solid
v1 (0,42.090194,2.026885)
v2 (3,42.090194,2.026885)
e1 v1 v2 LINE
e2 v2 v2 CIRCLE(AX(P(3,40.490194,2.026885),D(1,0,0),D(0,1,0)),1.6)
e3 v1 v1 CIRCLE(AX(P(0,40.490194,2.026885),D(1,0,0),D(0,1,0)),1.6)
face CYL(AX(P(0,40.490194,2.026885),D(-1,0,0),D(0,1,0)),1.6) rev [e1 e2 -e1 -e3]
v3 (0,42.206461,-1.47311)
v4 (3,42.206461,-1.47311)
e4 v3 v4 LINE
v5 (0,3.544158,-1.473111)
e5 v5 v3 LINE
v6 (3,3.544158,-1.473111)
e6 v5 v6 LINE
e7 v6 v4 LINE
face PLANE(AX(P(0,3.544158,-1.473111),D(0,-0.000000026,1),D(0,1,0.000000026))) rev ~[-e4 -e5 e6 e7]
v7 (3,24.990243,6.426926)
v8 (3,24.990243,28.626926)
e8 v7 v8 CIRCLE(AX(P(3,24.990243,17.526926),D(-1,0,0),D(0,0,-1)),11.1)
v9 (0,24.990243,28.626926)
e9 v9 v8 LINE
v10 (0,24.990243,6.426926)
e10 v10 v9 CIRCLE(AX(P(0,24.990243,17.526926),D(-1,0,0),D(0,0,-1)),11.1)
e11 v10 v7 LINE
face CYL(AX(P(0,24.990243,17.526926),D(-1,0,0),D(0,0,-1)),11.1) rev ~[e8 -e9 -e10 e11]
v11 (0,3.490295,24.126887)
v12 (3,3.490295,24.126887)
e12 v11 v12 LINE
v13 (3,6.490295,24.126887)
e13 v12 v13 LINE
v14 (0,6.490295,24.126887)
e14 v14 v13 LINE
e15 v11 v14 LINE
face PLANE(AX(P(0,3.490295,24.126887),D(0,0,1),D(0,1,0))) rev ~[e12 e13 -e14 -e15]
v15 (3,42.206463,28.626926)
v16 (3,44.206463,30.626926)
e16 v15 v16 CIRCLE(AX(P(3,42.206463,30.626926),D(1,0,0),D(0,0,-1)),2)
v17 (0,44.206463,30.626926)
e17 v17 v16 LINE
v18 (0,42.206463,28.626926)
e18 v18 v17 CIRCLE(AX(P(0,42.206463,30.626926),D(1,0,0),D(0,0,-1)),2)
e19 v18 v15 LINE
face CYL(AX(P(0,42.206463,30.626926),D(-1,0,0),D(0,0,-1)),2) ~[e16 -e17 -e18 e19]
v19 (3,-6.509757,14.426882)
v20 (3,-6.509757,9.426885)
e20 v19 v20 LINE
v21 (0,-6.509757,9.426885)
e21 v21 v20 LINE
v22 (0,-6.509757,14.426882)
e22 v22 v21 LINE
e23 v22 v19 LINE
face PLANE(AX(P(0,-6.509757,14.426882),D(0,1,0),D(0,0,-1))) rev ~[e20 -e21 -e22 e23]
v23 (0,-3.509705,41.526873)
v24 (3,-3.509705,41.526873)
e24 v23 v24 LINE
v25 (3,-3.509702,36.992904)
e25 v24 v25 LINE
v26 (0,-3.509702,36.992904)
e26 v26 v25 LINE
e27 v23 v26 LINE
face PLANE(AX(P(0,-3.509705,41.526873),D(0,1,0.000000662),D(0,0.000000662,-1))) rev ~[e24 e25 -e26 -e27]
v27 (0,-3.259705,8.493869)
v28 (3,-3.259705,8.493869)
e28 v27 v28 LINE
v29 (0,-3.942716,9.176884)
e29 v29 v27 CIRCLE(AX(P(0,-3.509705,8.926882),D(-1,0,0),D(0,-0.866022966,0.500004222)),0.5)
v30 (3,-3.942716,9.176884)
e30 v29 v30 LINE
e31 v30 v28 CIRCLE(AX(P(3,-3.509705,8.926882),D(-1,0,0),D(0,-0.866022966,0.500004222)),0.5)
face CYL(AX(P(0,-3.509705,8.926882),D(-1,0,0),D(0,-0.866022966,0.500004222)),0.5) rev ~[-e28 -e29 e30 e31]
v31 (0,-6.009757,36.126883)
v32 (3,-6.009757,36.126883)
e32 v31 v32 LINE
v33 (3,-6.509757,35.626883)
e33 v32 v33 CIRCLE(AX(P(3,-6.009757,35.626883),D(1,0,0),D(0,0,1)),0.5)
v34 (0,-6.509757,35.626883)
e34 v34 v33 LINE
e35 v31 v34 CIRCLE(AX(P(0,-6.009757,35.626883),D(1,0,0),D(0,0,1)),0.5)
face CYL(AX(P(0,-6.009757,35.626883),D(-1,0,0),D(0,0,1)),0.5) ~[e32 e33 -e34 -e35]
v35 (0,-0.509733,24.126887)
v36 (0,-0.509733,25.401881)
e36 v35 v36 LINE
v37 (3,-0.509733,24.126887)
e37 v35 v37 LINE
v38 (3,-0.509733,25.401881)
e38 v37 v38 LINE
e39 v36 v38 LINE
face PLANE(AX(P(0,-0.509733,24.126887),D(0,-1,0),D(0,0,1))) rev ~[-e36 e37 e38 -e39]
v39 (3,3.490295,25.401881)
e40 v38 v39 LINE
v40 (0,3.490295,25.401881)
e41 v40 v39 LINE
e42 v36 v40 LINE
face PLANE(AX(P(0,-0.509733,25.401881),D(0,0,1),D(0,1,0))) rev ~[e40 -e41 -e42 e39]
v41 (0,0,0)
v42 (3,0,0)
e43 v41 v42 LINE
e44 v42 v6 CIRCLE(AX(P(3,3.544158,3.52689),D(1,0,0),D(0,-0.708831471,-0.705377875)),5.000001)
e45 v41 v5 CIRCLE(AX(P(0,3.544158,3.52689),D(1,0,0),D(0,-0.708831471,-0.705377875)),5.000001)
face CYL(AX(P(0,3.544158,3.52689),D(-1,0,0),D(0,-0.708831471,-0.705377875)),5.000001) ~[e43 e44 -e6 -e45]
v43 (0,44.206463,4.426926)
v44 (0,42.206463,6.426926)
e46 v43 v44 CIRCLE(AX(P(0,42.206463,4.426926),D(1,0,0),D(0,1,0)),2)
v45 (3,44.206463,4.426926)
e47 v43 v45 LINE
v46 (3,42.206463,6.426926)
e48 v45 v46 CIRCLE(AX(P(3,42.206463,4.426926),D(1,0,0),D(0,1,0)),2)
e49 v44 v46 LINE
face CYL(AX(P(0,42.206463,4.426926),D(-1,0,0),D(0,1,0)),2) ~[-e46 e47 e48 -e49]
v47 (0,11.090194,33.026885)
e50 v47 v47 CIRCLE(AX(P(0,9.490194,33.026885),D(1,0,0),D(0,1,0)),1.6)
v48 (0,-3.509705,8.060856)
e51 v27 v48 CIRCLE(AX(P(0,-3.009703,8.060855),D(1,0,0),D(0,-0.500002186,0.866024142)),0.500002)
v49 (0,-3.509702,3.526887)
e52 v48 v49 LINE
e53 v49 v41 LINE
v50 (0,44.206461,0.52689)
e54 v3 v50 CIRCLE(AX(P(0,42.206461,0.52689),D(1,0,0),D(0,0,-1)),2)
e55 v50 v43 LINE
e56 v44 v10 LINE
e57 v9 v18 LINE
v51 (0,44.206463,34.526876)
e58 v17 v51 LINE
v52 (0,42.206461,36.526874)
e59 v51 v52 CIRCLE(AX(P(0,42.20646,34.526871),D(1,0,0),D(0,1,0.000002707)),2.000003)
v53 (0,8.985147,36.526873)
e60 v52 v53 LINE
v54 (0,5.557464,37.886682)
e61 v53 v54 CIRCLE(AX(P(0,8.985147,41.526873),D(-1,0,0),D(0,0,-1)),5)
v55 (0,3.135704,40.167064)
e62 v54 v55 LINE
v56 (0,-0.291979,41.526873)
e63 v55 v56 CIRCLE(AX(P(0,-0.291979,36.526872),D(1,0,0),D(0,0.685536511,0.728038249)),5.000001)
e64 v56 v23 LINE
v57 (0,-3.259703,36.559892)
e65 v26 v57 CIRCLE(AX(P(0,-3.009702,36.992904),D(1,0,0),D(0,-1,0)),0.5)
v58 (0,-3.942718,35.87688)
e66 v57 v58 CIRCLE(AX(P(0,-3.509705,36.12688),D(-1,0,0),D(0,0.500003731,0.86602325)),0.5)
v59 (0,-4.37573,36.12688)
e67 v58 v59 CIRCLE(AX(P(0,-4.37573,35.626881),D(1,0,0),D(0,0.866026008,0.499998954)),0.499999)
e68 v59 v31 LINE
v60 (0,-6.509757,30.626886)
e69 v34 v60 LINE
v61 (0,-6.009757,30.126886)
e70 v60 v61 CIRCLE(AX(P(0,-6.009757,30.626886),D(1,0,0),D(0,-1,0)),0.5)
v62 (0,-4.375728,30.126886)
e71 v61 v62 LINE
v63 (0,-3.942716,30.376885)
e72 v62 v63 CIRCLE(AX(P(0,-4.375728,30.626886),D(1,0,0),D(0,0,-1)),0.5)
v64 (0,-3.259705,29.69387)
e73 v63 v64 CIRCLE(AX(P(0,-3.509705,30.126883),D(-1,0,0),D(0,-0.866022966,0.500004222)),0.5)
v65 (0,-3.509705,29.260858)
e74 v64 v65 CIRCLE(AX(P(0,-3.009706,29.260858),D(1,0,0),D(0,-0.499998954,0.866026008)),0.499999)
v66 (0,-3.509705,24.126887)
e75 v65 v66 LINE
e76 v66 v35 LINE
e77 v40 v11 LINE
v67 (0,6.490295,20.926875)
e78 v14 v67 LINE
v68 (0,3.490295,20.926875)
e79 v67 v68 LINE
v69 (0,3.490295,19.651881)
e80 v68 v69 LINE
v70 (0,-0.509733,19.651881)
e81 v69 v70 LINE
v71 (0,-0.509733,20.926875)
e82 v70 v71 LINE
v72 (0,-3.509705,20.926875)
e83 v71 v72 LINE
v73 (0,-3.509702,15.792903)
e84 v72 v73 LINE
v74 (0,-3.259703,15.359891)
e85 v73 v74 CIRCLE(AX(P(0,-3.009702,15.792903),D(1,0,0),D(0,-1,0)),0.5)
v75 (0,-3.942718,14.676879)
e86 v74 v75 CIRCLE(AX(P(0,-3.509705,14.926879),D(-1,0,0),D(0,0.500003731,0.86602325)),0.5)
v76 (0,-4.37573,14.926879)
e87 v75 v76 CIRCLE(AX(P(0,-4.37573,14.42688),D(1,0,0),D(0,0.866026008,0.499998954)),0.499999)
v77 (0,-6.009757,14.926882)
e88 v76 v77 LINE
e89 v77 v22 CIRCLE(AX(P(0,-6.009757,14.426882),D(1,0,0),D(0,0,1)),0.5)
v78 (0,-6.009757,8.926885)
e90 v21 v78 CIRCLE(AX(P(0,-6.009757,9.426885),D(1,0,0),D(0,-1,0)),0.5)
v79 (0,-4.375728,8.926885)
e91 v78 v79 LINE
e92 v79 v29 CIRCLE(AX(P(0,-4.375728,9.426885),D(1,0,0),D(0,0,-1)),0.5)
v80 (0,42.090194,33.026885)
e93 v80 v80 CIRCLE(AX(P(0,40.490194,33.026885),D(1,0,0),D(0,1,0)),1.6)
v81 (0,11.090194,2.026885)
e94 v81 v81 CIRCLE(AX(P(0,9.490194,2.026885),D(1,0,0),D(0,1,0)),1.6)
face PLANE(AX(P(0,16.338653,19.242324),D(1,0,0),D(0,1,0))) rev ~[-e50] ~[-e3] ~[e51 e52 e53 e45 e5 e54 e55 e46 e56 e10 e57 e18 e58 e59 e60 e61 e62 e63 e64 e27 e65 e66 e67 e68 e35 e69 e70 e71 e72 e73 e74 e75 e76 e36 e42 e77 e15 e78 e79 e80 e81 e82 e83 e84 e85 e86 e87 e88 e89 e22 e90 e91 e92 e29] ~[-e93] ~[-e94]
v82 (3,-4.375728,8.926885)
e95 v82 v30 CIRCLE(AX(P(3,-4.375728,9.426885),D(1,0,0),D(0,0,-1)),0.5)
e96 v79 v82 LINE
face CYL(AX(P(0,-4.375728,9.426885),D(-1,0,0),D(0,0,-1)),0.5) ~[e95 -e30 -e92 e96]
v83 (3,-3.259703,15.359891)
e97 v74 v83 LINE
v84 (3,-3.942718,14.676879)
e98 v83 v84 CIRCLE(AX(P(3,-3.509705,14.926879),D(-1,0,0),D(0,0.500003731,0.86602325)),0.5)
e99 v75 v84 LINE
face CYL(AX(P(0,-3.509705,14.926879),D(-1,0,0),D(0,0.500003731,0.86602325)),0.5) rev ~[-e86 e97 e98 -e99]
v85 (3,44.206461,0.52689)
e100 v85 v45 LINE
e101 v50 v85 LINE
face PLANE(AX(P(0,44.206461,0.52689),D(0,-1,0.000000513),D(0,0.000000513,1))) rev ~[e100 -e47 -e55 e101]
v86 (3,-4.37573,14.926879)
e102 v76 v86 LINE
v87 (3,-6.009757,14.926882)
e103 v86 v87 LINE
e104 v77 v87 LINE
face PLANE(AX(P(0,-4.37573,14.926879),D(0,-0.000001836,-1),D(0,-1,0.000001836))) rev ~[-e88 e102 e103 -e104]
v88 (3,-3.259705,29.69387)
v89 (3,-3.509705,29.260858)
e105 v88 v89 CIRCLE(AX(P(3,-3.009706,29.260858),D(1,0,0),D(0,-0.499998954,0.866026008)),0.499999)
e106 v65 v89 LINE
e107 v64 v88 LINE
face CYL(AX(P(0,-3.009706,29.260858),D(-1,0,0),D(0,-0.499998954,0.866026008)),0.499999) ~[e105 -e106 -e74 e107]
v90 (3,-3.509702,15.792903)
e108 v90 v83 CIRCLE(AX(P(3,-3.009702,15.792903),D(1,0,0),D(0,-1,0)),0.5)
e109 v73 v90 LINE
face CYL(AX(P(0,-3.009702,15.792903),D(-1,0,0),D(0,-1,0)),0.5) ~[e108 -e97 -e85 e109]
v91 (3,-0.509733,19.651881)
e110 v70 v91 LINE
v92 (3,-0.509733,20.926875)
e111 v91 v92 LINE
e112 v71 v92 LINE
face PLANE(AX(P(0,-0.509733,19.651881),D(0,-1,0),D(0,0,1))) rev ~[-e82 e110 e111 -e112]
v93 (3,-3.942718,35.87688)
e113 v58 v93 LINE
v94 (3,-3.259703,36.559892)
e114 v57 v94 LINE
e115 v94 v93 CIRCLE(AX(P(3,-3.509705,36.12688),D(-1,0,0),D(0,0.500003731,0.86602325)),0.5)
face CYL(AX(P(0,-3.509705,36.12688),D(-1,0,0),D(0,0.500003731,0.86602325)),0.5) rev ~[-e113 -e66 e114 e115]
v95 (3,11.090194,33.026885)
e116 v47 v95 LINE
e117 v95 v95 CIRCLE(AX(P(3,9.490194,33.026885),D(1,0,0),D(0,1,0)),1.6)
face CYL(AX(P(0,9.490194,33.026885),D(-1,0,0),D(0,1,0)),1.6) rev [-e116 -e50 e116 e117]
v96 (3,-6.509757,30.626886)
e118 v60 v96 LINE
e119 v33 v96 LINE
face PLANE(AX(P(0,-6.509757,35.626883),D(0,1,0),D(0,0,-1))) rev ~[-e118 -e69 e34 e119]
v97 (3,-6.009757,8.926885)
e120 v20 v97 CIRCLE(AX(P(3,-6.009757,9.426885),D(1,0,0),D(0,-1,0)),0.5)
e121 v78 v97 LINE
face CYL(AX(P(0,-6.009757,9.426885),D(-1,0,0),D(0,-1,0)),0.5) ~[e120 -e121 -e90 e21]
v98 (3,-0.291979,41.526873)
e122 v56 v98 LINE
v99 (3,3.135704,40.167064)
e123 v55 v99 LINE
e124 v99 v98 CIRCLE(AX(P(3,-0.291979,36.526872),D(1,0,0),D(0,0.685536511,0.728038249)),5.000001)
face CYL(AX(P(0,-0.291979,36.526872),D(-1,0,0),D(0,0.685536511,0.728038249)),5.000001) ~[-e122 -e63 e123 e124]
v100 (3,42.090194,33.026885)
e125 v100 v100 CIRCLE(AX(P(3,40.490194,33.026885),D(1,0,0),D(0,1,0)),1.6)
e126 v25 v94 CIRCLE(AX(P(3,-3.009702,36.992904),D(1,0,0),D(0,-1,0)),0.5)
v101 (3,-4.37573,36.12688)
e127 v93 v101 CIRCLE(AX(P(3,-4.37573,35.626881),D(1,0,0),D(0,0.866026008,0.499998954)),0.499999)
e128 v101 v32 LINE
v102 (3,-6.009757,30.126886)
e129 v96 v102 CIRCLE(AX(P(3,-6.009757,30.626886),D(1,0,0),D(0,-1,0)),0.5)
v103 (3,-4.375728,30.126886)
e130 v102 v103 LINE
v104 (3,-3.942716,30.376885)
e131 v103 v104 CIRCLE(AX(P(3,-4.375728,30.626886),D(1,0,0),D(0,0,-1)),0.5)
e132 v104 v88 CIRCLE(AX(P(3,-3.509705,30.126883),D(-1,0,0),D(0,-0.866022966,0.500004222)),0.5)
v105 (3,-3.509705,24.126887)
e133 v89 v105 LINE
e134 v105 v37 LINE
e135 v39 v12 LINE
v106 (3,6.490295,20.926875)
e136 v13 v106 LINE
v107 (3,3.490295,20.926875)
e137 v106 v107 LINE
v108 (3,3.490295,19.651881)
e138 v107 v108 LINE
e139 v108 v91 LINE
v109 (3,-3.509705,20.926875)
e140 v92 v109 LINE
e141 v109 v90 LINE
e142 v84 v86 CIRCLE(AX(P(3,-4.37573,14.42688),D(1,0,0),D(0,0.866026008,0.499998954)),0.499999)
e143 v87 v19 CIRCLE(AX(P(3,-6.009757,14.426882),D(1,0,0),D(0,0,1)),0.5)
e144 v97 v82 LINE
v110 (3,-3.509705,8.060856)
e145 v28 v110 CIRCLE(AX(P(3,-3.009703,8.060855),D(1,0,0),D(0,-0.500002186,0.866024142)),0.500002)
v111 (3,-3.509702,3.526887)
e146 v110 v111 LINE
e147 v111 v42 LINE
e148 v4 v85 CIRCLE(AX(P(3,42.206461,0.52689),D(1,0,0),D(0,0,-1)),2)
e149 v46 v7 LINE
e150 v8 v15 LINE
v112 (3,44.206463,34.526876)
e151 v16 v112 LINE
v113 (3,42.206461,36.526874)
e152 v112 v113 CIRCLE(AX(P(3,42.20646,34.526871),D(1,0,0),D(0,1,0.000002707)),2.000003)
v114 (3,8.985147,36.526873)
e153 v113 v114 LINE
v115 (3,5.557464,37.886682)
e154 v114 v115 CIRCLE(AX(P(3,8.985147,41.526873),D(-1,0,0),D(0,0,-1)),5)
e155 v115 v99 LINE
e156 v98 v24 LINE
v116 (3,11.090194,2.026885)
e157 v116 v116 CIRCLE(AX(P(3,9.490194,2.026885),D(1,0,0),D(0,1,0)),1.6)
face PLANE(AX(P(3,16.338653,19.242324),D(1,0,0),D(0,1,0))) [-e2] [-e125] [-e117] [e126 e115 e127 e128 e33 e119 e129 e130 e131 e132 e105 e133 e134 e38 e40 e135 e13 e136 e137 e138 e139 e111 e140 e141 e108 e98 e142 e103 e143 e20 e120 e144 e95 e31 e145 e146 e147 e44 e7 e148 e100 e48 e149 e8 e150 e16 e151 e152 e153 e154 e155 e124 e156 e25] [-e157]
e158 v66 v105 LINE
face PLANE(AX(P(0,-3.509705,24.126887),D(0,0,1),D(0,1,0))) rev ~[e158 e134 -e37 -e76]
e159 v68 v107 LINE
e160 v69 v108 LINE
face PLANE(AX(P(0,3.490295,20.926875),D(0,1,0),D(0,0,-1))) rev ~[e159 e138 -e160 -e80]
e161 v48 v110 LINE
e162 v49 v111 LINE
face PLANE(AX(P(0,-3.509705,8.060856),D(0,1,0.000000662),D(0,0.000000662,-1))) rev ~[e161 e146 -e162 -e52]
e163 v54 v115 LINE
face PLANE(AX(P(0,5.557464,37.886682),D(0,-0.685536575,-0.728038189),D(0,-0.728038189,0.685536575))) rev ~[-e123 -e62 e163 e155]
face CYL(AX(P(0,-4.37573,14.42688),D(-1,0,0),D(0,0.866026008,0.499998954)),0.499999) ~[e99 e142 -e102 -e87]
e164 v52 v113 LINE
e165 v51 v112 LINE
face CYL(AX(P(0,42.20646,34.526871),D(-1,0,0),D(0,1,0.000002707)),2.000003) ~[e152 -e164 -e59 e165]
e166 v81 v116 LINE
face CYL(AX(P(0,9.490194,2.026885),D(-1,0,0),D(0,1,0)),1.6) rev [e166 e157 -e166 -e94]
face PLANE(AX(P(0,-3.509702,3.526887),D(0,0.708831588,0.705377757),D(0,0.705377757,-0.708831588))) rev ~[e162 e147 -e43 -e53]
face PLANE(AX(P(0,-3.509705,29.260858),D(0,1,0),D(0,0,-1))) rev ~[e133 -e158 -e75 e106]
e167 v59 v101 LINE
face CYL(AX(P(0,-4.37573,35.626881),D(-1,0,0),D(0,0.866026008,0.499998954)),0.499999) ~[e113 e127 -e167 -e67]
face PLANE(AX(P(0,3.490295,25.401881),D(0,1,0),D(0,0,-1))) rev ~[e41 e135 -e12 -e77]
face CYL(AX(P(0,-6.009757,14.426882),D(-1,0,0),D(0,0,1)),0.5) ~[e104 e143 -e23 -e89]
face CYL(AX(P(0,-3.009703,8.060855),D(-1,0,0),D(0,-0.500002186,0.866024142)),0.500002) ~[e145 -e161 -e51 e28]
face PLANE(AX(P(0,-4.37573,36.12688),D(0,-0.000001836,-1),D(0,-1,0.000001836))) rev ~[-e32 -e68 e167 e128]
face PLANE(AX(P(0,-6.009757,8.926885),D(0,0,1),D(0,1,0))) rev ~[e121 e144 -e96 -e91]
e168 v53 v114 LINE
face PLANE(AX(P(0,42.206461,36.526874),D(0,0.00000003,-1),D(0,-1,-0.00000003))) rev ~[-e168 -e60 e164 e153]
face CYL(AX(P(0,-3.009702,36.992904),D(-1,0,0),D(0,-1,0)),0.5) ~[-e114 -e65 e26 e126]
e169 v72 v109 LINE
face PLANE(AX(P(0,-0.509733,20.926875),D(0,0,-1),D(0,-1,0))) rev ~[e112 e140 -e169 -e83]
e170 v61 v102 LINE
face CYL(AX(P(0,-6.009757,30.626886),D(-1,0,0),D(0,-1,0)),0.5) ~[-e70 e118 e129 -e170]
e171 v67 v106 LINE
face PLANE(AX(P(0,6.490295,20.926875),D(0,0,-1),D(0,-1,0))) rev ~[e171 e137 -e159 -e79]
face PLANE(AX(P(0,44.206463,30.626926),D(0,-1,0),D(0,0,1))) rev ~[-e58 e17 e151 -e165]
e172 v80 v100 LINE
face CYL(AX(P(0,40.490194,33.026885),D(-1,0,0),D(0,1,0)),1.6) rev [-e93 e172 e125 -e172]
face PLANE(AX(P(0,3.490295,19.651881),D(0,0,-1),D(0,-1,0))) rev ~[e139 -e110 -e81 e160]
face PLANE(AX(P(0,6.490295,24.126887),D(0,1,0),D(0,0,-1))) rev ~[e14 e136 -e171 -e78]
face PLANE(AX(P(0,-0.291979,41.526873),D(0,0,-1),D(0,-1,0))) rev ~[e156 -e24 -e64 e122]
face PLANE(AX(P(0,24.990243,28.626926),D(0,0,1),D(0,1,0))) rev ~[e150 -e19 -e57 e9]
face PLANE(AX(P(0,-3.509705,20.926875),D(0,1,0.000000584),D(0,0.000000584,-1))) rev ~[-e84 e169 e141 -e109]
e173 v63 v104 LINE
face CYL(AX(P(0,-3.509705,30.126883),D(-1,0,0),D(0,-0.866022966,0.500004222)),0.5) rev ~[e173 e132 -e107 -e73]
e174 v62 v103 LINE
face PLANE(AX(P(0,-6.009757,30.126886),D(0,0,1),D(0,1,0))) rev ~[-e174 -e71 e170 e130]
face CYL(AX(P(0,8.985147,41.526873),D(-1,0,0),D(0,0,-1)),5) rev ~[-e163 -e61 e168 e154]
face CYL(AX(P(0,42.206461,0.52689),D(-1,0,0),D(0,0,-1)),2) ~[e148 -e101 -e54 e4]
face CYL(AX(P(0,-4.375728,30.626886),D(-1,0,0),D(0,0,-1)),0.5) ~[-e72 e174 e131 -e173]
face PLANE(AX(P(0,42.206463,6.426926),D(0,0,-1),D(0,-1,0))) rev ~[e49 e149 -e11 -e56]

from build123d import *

# Parameters (mm, degrees)
F0_R     = 1.6
F1_DEPTH = 3


# Not quite as in the source:
# - ends of sketch curves that miss each other by under 0.0002 mm in the source are joined


with BuildPart() as f1:
    # F0 (on Right) → F1 (new body)
    with BuildSketch(Plane.YZ):
        with BuildLine():
            Line((6.490295, 24.126887), (6.490295, 20.926875))
            Line((6.490295, 20.926875), (3.490295, 20.926875))
            Line((3.490295, 20.926875), (3.490295, 19.651881))
            Line((3.490295, 19.651881), (-0.509733, 19.651881))
            Line((-0.509733, 19.651881), (-0.509733, 20.926875))
            Line((-0.509733, 20.926875), (-3.509705, 20.926875))
            Line((-3.509705, 20.926875), (-3.509702, 15.792903))
            ThreePointArc((-3.509702, 15.792903), (-3.4427150061, 15.542903527), (-3.2597030539, 15.3598909066))
            ThreePointArc((-3.2597030539, 15.3598909066), (-3.1561520924, 14.5733251264), (-3.9427177764, 14.6768791291))
            ThreePointArc((-3.9427177764, 14.6768791291), (-4.1257299355, 14.8598916646), (-4.37573, 14.926879))
            Line((-4.37573, 14.926879), (-6.009757, 14.926882))
            ThreePointArc((-6.009757, 14.926882), (-6.3633103906, 14.7804353906), (-6.509757, 14.426882))
            Line((-6.509757, 14.426882), (-6.509757, 9.426885))
            ThreePointArc((-6.509757, 9.426885), (-6.3633103906, 9.0733316094), (-6.009757, 8.926885))
            Line((-6.009757, 8.926885), (-4.375728, 8.926885))
            ThreePointArc((-4.375728, 8.926885), (-4.125728527, 8.9938719939), (-3.9427159066, 9.1768839461))
            ThreePointArc((-3.9427159066, 9.1768839461), (-3.1561511264, 9.2804349076), (-3.2597051291, 8.4938692236))
            ThreePointArc((-3.2597051291, 8.4938692236), (-3.4427176646, 8.3108560645), (-3.509705, 8.060856))
            Line((-3.509705, 8.060856), (-3.509702, 3.526887))
            Line((-3.509702, 3.526887), (0, 0))
            ThreePointArc((0, 0), (1.6251015018, -1.0901687381), (3.544158, -1.473111))
            Line((3.544158, -1.473111), (42.206461, -1.47311))
            ThreePointArc((42.206461, -1.47311), (43.6206745624, -0.8873235624), (44.206461, 0.52689))
            Line((44.206461, 0.52689), (44.206463, 4.426926))
            ThreePointArc((44.206463, 4.426926), (43.6206765624, 5.8411395624), (42.206463, 6.426926))
            Line((42.206463, 6.426926), (24.990243, 6.426926))
            ThreePointArc((24.990243, 6.426926), (13.890243, 17.526926), (24.990243, 28.626926))
            Line((24.990243, 28.626926), (42.206463, 28.626926))
            ThreePointArc((42.206463, 28.626926), (43.6206765624, 29.2127124376), (44.206463, 30.626926))
            Line((44.206463, 30.626926), (44.206463, 34.526876))
            ThreePointArc((44.206463, 34.526876), (43.6206745624, 35.9410875624), (42.206461, 36.526874))
            Line((42.206461, 36.526874), (8.985147, 36.526873))
            ThreePointArc((8.985147, 36.526873), (7.141367531, 36.8792416388), (5.5574640867, 37.8866820921))
            Line((5.5574640867, 37.8866820921), (3.135704, 40.167064))
            ThreePointArc((3.135704, 40.167064), (1.551800469, 41.1745043612), (-0.291979, 41.526873))
            Line((-0.291979, 41.526873), (-3.509705, 41.526873))
            Line((-3.509705, 41.526873), (-3.509702, 36.992904))
            ThreePointArc((-3.509702, 36.992904), (-3.4427150061, 36.742904527), (-3.2597030539, 36.5598919066))
            ThreePointArc((-3.2597030539, 36.5598919066), (-3.1561520924, 35.7733261264), (-3.9427177764, 35.8768801291))
            ThreePointArc((-3.9427177764, 35.8768801291), (-4.1257299355, 36.0598926646), (-4.37573, 36.12688))
            Line((-4.37573, 36.12688), (-6.009757, 36.126883))
            ThreePointArc((-6.009757, 36.126883), (-6.3633103906, 35.9804363906), (-6.509757, 35.626883))
            Line((-6.509757, 35.626883), (-6.509757, 30.626886))
            ThreePointArc((-6.509757, 30.626886), (-6.3633103906, 30.2733326094), (-6.009757, 30.126886))
            Line((-6.009757, 30.126886), (-4.375728, 30.126886))
            ThreePointArc((-4.375728, 30.126886), (-4.125728527, 30.1938729939), (-3.9427159066, 30.3768849461))
            ThreePointArc((-3.9427159066, 30.3768849461), (-3.1561511264, 30.4804359076), (-3.2597051291, 29.6938702236))
            ThreePointArc((-3.2597051291, 29.6938702236), (-3.4427176646, 29.5108580645), (-3.509705, 29.260858))
            Line((-3.509705, 29.260858), (-3.509705, 24.126887))
            Line((-3.509705, 24.126887), (-0.509733, 24.126887))
            Line((-0.509733, 24.126887), (-0.509733, 25.401881))
            Line((-0.509733, 25.401881), (3.490295, 25.401881))
            Line((3.490295, 25.401881), (3.490295, 24.126887))
            Line((3.490295, 24.126887), (6.490295, 24.126887))
        make_face()
        with Locations((9.490194, 2.026885)):
            Circle(F0_R, mode=Mode.SUBTRACT)
        with Locations((40.490194, 2.026885)):
            Circle(F0_R, mode=Mode.SUBTRACT)
        with Locations((9.490194, 33.026885)):
            Circle(F0_R, mode=Mode.SUBTRACT)
        with Locations((40.490194, 33.026885)):
            Circle(F0_R, mode=Mode.SUBTRACT)
    extrude(amount=F1_DEPTH)


solid = f1.part
